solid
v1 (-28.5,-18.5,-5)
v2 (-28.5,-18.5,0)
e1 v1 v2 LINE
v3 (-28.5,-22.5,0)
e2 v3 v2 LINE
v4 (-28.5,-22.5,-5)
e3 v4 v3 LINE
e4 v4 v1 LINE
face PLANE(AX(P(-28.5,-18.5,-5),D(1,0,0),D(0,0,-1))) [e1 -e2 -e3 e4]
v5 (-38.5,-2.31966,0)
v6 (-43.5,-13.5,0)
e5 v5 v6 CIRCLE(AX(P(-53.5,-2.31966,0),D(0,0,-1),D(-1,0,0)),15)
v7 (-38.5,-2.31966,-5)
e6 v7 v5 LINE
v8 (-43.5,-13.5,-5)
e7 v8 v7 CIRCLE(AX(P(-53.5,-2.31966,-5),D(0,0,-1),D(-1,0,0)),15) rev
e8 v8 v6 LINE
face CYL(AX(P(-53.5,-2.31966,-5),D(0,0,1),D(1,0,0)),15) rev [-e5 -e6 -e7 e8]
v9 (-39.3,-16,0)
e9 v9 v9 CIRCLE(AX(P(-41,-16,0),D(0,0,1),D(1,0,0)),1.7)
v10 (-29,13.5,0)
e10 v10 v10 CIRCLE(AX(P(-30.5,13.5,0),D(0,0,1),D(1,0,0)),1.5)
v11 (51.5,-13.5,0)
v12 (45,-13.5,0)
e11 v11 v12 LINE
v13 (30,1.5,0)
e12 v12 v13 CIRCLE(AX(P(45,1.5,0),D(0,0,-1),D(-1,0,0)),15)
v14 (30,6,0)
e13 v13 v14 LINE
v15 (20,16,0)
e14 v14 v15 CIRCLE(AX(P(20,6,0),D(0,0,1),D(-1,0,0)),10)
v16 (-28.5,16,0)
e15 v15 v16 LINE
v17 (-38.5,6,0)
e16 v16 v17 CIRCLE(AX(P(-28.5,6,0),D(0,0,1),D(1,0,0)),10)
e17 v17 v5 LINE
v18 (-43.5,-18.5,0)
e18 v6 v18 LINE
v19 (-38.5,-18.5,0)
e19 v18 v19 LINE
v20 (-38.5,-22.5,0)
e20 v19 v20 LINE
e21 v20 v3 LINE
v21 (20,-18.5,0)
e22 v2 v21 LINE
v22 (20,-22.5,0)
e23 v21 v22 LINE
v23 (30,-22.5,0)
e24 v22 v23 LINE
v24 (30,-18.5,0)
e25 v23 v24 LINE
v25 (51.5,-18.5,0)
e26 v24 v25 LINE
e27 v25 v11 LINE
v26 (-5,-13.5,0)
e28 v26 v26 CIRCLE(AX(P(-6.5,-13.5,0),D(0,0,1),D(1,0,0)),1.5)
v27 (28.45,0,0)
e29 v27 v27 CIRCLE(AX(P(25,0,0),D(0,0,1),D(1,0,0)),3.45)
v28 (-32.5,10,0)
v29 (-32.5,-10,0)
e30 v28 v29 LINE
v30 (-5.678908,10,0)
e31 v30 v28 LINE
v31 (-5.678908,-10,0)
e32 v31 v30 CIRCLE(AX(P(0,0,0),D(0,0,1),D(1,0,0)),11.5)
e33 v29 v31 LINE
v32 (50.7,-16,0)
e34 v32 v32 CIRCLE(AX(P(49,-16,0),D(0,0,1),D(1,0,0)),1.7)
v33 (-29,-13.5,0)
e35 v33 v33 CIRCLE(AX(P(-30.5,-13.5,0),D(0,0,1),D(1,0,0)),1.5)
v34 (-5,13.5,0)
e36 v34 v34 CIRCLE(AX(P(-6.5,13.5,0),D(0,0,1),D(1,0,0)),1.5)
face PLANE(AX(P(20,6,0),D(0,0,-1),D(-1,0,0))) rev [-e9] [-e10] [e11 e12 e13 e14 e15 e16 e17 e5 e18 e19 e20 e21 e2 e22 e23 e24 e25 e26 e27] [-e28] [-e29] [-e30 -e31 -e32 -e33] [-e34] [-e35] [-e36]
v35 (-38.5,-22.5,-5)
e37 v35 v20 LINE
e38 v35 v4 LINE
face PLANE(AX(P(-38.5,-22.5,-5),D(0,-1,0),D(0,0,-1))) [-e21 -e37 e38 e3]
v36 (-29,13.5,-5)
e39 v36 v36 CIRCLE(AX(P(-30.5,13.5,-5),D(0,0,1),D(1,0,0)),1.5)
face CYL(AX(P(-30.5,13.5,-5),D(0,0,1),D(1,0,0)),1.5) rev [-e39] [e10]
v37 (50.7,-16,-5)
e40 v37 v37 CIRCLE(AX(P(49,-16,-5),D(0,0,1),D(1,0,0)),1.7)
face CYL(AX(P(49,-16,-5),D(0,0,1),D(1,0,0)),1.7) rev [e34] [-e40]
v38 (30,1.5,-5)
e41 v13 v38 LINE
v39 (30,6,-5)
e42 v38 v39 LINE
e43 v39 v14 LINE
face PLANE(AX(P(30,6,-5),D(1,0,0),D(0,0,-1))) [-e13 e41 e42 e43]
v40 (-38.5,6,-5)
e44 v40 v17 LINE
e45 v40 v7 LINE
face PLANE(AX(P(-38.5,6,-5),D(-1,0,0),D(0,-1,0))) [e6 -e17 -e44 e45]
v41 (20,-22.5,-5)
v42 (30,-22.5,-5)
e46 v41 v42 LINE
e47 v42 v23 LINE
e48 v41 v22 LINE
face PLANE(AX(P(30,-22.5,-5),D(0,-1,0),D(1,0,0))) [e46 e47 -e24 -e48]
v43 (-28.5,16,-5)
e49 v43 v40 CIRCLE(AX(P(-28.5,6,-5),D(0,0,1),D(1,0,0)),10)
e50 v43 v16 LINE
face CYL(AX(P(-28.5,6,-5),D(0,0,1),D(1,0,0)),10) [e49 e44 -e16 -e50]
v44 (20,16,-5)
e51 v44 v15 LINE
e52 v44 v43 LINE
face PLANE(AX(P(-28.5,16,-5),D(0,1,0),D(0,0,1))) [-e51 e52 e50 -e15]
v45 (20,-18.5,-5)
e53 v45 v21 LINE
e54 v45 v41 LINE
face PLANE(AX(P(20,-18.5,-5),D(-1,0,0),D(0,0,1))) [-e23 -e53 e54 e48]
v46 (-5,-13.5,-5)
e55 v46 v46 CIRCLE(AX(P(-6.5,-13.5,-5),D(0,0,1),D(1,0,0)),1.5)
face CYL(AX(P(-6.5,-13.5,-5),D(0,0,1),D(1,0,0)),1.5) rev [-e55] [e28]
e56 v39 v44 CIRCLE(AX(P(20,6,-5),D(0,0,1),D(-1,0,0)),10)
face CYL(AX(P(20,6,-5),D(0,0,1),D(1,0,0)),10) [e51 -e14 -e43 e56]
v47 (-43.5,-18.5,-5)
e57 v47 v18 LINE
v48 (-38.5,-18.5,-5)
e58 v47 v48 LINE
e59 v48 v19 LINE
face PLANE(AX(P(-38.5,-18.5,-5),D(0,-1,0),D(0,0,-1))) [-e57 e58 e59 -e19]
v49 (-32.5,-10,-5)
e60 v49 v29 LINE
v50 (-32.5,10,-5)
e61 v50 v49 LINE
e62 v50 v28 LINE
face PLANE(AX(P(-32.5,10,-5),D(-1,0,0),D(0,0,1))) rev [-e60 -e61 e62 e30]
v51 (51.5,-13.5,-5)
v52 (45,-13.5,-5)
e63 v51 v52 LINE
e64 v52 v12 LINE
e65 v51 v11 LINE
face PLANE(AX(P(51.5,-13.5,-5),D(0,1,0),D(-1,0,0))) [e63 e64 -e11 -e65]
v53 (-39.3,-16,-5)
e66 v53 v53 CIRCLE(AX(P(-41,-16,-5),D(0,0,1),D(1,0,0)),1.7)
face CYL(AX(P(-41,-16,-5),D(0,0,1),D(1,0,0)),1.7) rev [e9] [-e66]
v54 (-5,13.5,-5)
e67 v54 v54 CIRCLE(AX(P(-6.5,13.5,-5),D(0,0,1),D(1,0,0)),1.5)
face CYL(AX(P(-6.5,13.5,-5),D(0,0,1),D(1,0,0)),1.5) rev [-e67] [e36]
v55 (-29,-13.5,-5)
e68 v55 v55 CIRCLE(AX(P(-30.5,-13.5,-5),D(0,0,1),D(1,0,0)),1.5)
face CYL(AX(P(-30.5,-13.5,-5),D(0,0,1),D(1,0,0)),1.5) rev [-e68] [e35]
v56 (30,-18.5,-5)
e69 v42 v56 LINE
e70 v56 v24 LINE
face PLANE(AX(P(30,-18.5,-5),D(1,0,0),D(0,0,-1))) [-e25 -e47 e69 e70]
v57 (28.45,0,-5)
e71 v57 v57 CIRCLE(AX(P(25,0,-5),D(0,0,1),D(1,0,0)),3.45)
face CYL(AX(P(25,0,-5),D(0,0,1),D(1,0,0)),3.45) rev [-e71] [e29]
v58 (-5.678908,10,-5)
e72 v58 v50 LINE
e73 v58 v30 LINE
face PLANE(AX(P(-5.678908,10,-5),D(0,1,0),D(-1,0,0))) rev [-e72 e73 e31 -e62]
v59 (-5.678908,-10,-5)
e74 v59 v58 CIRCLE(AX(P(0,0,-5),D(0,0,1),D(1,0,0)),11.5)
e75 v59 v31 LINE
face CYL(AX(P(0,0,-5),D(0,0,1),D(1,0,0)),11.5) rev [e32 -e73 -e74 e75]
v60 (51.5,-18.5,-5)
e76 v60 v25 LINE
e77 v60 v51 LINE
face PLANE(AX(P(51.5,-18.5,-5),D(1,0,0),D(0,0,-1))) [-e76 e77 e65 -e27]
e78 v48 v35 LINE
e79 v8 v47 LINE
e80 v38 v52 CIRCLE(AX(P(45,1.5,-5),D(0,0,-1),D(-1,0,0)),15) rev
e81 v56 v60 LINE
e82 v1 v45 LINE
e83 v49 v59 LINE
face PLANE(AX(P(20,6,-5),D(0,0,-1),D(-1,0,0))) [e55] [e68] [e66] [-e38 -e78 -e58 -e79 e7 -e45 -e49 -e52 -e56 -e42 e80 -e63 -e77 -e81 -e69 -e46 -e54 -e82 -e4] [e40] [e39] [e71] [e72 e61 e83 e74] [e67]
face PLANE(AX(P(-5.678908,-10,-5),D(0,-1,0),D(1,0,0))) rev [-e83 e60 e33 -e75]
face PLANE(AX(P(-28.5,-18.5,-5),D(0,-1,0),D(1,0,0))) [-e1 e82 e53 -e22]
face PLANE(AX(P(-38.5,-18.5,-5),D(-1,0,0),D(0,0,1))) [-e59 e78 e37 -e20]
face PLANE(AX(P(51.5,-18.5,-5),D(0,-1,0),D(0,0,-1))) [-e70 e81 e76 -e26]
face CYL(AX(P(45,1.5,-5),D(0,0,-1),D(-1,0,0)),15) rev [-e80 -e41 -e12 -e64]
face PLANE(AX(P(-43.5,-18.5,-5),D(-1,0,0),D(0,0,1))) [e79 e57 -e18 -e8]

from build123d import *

# Parameters (mm, degrees)
SKETCH1_R          = 3.45
SKETCH1_R_2        = 1.5
SKETCH1_R_3        = 1.7
BASE_FLANGE1_DEPTH = 5
FILLET1_R          = 15
FILLET2_R          = 15


# Sheet-metal steps are written as plain solids
with BuildPart() as part:
    # Sketch1 → Base-Flange1 (new body)
    with BuildSketch(Plane.XY):
        with BuildLine():
            Line((-28.5, 16), (20, 16))
            ThreePointArc((20, 16), (27.071067812, 13.071067812), (30, 6))
            Line((30, 6), (30, -13.5))
            Line((30, -13.5), (51.5, -13.5))
            Line((51.5, -13.5), (51.5, -18.5))
            Line((51.5, -18.5), (30, -18.5))
            Line((30, -18.5), (30, -22.5))
            Line((30, -22.5), (20, -22.5))
            Line((20, -22.5), (20, -18.5))
            Line((20, -18.5), (-28.5, -18.5))
            Line((-28.5, -18.5), (-28.5, -22.5))
            Line((-28.5, -22.5), (-38.5, -22.5))
            Line((-38.5, -22.5), (-38.5, -18.5))
            Line((-38.5, -18.5), (-43.5, -18.5))
            Line((-43.5, -18.5), (-43.5, -13.5))
            Line((-43.5, -13.5), (-38.5, -13.5))
            Line((-38.5, -13.5), (-38.5, 6))
            ThreePointArc((-38.5, 6), (-35.571067812, 13.071067812), (-28.5, 16))
        make_face()
        with Locations((25, 0)):
            Circle(SKETCH1_R, mode=Mode.SUBTRACT)
        with Locations((-6.5, 13.5)):
            Circle(SKETCH1_R_2, mode=Mode.SUBTRACT)
        with Locations((-30.5, 13.5)):
            Circle(SKETCH1_R_2, mode=Mode.SUBTRACT)
        with Locations((-30.5, -13.5)):
            Circle(SKETCH1_R_2, mode=Mode.SUBTRACT)
        with Locations((-6.5, -13.5)):
            Circle(SKETCH1_R_2, mode=Mode.SUBTRACT)
        with Locations((-41, -16)):
            Circle(SKETCH1_R_3, mode=Mode.SUBTRACT)
        with Locations((49, -16)):
            Circle(SKETCH1_R_3, mode=Mode.SUBTRACT)
        with BuildLine():
            Line((-5.678908346, 10), (-32.5, 10))
            Line((-32.5, 10), (-32.5, -10))
            Line((-32.5, -10), (-5.678908346, -10))
            ThreePointArc((-5.678908346, -10), (11.5, 0), (-5.678908346, 10))
        make_face(mode=Mode.SUBTRACT)
    extrude(amount=-BASE_FLANGE1_DEPTH)

    # Fillet1
    fillet1_edges = [part.edges().sort_by_distance(p)[0] for p in [
        (30, -13.5, -2.5),
    ]]
    fillet(fillet1_edges, radius=FILLET1_R)

    # Fillet2
    # the kernel refuses this fillet: 15 mm, written as the material it adds along each edge
    with BuildSketch(Plane(origin=(-38.5, -13.5, 0), x_dir=(0, 1, 0), z_dir=(0, 0, -1))) as fillet2_piece_1:
        with BuildLine():
            CenterArc((11.180339887, -15), FILLET2_R, 90, 48.189685104)
            Line((0, -5), (-0.223606798, -4.8))
            ThreePointArc((-0.223606798, -4.8), (-0.3, -2.5), (-0.3, 0))
            Line((-0.3, 0), (0, 0.3))
            Line((0, 0.3), (11.180339887, 0.3))
            Line((11.180339887, 0.3), (11.180339887, 0))
        make_face()
    extrude(amount=5)


solid = part.part
